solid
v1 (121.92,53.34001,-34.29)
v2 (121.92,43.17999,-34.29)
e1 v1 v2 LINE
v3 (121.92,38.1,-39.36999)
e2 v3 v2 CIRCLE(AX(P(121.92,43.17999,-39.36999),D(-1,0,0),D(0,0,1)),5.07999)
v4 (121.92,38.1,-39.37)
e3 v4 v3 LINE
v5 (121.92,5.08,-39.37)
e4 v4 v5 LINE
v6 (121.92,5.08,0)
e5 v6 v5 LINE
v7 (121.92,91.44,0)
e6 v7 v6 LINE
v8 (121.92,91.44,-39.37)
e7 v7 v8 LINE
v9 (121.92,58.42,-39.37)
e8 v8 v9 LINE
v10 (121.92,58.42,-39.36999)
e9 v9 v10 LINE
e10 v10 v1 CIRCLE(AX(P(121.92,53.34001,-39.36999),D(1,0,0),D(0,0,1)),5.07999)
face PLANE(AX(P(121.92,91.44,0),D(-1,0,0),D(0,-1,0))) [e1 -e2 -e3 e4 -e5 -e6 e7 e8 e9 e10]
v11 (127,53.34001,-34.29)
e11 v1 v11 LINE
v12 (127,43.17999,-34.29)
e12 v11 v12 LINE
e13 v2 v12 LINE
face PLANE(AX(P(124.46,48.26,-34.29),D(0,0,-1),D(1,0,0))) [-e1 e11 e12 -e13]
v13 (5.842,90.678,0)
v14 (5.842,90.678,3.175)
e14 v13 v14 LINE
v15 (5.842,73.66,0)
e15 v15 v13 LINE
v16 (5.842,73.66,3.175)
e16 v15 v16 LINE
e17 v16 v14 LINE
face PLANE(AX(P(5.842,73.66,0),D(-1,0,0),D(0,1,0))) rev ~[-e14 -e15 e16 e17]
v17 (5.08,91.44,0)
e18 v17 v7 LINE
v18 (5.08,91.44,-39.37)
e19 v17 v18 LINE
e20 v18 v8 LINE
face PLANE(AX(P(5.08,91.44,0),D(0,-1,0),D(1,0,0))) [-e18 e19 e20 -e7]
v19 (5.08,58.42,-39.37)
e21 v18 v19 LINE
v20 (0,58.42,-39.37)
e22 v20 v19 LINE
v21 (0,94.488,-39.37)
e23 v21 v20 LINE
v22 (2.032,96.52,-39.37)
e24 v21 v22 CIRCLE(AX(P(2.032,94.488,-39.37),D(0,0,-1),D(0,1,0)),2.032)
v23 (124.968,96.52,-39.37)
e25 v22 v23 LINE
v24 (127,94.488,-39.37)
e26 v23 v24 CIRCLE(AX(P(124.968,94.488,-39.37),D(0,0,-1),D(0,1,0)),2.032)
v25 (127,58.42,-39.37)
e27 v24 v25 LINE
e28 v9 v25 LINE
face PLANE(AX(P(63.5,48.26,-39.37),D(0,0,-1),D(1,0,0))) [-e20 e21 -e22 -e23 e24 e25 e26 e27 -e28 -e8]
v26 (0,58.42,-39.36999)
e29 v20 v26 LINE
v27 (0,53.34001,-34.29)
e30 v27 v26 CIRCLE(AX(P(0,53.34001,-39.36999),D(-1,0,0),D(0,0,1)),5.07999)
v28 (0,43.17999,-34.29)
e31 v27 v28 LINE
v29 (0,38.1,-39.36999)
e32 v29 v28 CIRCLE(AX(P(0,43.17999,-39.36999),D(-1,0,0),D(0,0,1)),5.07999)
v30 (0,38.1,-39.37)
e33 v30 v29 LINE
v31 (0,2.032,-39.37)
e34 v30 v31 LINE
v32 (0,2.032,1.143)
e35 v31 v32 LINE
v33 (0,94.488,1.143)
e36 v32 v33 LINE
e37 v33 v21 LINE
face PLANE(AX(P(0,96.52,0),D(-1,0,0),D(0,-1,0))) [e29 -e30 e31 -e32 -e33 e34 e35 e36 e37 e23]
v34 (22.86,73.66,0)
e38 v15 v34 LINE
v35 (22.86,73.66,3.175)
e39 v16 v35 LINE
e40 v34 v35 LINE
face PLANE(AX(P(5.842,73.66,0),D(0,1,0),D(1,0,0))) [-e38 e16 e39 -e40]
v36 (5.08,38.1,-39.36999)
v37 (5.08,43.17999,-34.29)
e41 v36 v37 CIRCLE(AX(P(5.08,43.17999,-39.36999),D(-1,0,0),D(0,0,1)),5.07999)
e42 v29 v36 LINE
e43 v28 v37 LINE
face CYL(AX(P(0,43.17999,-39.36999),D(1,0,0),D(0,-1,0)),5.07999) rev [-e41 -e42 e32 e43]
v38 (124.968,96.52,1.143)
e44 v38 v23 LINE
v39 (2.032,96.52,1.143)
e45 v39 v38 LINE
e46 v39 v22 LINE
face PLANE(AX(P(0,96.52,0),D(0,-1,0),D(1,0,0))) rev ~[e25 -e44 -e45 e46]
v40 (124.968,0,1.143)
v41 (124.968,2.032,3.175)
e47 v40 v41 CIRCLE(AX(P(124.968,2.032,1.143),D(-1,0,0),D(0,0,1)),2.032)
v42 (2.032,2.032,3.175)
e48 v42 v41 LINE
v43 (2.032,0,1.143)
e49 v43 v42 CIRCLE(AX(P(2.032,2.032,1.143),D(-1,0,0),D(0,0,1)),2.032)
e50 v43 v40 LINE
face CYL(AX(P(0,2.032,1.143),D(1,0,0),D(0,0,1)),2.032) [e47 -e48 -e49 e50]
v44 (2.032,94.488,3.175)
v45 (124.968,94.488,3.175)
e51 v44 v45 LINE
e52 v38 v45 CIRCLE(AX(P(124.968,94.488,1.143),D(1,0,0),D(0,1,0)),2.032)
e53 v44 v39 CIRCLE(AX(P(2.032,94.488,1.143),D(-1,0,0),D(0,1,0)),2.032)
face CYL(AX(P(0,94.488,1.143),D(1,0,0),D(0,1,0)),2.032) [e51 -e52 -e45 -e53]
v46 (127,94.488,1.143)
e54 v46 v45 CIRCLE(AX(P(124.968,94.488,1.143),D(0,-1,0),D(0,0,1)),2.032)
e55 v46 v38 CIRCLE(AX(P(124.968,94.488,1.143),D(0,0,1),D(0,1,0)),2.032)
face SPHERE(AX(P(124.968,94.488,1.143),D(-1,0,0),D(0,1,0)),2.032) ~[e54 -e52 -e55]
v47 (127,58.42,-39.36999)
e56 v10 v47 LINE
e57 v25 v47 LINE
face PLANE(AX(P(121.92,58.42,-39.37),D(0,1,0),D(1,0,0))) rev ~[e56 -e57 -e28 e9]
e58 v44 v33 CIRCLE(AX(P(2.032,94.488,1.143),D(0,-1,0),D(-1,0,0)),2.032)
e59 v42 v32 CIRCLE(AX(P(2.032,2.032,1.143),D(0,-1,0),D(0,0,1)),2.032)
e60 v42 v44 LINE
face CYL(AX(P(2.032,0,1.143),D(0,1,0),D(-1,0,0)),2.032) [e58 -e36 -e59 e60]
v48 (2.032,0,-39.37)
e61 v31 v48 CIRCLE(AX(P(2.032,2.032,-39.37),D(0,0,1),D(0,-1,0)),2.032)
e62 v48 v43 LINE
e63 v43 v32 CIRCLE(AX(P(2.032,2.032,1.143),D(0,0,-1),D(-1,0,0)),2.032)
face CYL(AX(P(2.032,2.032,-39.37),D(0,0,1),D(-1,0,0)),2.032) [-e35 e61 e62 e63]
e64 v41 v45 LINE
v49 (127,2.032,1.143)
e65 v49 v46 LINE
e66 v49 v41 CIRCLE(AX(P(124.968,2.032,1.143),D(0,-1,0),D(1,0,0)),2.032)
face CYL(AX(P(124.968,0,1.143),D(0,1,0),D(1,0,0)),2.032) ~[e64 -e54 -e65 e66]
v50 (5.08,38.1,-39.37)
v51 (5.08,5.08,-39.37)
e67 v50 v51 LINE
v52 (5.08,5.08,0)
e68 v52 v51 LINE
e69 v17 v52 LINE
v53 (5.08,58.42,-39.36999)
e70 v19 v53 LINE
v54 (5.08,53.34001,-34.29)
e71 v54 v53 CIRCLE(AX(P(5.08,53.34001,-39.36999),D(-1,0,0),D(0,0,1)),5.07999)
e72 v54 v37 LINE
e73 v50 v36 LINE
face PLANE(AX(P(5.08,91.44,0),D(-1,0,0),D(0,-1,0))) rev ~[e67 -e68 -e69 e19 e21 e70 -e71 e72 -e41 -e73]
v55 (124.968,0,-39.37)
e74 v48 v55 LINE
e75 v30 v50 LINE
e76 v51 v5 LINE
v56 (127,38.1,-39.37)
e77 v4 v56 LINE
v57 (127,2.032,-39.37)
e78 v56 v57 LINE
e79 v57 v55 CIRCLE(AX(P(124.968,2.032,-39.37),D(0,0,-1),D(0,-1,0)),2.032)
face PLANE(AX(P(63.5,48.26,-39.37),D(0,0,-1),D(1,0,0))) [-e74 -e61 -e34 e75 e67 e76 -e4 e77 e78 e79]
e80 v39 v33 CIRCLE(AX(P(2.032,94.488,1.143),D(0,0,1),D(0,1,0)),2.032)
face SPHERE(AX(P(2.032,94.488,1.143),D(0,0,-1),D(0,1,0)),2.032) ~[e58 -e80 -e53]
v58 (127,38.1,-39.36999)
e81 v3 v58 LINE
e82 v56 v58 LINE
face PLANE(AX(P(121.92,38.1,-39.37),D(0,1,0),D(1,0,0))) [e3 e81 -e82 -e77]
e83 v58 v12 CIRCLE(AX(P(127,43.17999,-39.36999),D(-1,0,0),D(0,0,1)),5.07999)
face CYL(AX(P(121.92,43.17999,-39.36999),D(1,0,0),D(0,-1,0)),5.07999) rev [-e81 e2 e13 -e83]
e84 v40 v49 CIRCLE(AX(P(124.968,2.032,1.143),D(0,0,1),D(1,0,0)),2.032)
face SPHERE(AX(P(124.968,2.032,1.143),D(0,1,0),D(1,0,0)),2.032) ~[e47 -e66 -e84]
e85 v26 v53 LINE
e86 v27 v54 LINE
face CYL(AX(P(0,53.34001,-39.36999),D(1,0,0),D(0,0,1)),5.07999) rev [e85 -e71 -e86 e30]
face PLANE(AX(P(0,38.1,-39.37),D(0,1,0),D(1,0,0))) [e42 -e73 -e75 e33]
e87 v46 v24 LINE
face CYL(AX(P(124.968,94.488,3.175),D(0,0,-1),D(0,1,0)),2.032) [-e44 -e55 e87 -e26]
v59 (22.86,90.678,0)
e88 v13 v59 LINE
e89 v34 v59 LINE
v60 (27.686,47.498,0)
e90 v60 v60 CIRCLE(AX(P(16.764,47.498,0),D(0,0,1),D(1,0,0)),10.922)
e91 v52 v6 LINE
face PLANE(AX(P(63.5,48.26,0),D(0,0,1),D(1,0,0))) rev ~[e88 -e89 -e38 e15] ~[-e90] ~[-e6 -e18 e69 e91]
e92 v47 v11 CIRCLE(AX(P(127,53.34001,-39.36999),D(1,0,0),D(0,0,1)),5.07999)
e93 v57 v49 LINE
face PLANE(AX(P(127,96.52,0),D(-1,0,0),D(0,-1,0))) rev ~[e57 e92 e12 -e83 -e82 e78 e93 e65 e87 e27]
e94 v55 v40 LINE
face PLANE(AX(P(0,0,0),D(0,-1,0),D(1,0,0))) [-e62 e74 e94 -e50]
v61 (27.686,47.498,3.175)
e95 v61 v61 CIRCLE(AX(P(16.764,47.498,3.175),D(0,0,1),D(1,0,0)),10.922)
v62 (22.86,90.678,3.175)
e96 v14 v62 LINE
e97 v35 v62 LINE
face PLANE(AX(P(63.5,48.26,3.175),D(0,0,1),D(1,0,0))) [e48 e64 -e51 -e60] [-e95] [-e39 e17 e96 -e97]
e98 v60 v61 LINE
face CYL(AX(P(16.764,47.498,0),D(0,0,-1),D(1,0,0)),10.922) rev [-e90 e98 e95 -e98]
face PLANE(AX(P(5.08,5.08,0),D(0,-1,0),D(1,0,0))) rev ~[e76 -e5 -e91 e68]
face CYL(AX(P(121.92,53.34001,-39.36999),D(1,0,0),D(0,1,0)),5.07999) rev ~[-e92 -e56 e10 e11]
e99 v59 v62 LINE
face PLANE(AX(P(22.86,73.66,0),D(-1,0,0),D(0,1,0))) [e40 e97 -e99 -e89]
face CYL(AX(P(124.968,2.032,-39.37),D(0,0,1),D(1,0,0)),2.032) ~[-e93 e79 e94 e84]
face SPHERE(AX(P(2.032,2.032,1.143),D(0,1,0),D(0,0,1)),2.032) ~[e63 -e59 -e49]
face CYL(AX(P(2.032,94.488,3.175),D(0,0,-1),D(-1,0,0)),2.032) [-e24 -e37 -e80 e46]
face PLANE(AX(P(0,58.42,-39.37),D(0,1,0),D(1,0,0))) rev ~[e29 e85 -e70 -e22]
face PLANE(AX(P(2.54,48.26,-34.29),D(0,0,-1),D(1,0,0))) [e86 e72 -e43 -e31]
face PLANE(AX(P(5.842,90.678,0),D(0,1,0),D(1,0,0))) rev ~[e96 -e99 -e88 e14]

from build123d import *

# Parameters (mm, degrees)
F0_W     = 127
F0_H     = 96.52
F0_R     = 10.922
F0_W_2   = 17.018
F0_H_2   = 17.018
F1_DEPTH = 3.175
F2_W     = 127
F2_H     = 96.52
F2_W_2   = 116.8399999365
F2_H_2   = 86.3599999365
F3_DEPTH = 39.37
F4_R     = 2.032
F5_W     = 5.0800000317
F5_H     = 20.32
F6_DEPTH = 5.08
F7_R     = 5.07999


# Not quite as in the source:
# - a fillet or chamfer is up to 0.001 mm smaller than in the source, because OpenCascade refuses the exact size


with BuildPart() as f1:
    # F0 (on Top) → F1 (new body)
    with BuildSketch(Plane.XY):
        with Locations((63.5, 48.26)):
            Rectangle(F0_W, F0_H)
        with Locations((16.764, 47.498)):
            Circle(F0_R, mode=Mode.SUBTRACT)
        with Locations((14.351, 82.169)):
            Rectangle(F0_W_2, F0_H_2, mode=Mode.SUBTRACT)
    extrude(amount=F1_DEPTH)

    # F2 (on face) → F3 (join)
    with BuildSketch(Plane(origin=(0, 0, 0), x_dir=(1, 0, 0), z_dir=(0, 0, -1))):
        with Locations((63.5, -48.26)):
            Rectangle(F2_W, F2_H)
        with Locations((63.5, -48.26)):
            Rectangle(F2_W_2, F2_H_2, mode=Mode.SUBTRACT)
    extrude(amount=F3_DEPTH)

    # F4
    f4_edges = [f1.edges().sort_by_distance(p)[0] for p in [
        (0, 96.52, -18.0975),
        (63.5, 96.52, 3.175),
        (0, 48.26, 3.175),
        (127, 96.52, -18.0975),
        (127, 48.26, 3.175),
        (127, 0, -18.0975),
        (63.5, 0, 3.175),
        (0, 0, -18.0975),
    ]]
    fillet(f4_edges, radius=F4_R)

    # F5 (on face) → F6 (cut)
    with BuildSketch(Plane(origin=(0, 0, -39.37), x_dir=(1, 0, 0), z_dir=(0, 0, -1))):
        with Locations((124.4599999841, -48.26)):
            Rectangle(F5_W, F5_H)
        with Locations((2.5400000159, -48.26)):
            Rectangle(F5_W, F5_H)
    extrude(amount=-F6_DEPTH, mode=Mode.SUBTRACT)

    # F7 (radius 5.08 in the source; OpenCascade refuses exactly that, so slightly less here)
    f7_edges = [f1.edges().sort_by_distance(p)[0] for p in [
        (2.54, 38.1, -34.29),
        (2.54, 58.42, -34.29),
        (124.46, 58.42, -34.29),
        (124.46, 38.1, -34.29),
    ]]
    fillet(f7_edges, radius=F7_R)


solid = f1.part
